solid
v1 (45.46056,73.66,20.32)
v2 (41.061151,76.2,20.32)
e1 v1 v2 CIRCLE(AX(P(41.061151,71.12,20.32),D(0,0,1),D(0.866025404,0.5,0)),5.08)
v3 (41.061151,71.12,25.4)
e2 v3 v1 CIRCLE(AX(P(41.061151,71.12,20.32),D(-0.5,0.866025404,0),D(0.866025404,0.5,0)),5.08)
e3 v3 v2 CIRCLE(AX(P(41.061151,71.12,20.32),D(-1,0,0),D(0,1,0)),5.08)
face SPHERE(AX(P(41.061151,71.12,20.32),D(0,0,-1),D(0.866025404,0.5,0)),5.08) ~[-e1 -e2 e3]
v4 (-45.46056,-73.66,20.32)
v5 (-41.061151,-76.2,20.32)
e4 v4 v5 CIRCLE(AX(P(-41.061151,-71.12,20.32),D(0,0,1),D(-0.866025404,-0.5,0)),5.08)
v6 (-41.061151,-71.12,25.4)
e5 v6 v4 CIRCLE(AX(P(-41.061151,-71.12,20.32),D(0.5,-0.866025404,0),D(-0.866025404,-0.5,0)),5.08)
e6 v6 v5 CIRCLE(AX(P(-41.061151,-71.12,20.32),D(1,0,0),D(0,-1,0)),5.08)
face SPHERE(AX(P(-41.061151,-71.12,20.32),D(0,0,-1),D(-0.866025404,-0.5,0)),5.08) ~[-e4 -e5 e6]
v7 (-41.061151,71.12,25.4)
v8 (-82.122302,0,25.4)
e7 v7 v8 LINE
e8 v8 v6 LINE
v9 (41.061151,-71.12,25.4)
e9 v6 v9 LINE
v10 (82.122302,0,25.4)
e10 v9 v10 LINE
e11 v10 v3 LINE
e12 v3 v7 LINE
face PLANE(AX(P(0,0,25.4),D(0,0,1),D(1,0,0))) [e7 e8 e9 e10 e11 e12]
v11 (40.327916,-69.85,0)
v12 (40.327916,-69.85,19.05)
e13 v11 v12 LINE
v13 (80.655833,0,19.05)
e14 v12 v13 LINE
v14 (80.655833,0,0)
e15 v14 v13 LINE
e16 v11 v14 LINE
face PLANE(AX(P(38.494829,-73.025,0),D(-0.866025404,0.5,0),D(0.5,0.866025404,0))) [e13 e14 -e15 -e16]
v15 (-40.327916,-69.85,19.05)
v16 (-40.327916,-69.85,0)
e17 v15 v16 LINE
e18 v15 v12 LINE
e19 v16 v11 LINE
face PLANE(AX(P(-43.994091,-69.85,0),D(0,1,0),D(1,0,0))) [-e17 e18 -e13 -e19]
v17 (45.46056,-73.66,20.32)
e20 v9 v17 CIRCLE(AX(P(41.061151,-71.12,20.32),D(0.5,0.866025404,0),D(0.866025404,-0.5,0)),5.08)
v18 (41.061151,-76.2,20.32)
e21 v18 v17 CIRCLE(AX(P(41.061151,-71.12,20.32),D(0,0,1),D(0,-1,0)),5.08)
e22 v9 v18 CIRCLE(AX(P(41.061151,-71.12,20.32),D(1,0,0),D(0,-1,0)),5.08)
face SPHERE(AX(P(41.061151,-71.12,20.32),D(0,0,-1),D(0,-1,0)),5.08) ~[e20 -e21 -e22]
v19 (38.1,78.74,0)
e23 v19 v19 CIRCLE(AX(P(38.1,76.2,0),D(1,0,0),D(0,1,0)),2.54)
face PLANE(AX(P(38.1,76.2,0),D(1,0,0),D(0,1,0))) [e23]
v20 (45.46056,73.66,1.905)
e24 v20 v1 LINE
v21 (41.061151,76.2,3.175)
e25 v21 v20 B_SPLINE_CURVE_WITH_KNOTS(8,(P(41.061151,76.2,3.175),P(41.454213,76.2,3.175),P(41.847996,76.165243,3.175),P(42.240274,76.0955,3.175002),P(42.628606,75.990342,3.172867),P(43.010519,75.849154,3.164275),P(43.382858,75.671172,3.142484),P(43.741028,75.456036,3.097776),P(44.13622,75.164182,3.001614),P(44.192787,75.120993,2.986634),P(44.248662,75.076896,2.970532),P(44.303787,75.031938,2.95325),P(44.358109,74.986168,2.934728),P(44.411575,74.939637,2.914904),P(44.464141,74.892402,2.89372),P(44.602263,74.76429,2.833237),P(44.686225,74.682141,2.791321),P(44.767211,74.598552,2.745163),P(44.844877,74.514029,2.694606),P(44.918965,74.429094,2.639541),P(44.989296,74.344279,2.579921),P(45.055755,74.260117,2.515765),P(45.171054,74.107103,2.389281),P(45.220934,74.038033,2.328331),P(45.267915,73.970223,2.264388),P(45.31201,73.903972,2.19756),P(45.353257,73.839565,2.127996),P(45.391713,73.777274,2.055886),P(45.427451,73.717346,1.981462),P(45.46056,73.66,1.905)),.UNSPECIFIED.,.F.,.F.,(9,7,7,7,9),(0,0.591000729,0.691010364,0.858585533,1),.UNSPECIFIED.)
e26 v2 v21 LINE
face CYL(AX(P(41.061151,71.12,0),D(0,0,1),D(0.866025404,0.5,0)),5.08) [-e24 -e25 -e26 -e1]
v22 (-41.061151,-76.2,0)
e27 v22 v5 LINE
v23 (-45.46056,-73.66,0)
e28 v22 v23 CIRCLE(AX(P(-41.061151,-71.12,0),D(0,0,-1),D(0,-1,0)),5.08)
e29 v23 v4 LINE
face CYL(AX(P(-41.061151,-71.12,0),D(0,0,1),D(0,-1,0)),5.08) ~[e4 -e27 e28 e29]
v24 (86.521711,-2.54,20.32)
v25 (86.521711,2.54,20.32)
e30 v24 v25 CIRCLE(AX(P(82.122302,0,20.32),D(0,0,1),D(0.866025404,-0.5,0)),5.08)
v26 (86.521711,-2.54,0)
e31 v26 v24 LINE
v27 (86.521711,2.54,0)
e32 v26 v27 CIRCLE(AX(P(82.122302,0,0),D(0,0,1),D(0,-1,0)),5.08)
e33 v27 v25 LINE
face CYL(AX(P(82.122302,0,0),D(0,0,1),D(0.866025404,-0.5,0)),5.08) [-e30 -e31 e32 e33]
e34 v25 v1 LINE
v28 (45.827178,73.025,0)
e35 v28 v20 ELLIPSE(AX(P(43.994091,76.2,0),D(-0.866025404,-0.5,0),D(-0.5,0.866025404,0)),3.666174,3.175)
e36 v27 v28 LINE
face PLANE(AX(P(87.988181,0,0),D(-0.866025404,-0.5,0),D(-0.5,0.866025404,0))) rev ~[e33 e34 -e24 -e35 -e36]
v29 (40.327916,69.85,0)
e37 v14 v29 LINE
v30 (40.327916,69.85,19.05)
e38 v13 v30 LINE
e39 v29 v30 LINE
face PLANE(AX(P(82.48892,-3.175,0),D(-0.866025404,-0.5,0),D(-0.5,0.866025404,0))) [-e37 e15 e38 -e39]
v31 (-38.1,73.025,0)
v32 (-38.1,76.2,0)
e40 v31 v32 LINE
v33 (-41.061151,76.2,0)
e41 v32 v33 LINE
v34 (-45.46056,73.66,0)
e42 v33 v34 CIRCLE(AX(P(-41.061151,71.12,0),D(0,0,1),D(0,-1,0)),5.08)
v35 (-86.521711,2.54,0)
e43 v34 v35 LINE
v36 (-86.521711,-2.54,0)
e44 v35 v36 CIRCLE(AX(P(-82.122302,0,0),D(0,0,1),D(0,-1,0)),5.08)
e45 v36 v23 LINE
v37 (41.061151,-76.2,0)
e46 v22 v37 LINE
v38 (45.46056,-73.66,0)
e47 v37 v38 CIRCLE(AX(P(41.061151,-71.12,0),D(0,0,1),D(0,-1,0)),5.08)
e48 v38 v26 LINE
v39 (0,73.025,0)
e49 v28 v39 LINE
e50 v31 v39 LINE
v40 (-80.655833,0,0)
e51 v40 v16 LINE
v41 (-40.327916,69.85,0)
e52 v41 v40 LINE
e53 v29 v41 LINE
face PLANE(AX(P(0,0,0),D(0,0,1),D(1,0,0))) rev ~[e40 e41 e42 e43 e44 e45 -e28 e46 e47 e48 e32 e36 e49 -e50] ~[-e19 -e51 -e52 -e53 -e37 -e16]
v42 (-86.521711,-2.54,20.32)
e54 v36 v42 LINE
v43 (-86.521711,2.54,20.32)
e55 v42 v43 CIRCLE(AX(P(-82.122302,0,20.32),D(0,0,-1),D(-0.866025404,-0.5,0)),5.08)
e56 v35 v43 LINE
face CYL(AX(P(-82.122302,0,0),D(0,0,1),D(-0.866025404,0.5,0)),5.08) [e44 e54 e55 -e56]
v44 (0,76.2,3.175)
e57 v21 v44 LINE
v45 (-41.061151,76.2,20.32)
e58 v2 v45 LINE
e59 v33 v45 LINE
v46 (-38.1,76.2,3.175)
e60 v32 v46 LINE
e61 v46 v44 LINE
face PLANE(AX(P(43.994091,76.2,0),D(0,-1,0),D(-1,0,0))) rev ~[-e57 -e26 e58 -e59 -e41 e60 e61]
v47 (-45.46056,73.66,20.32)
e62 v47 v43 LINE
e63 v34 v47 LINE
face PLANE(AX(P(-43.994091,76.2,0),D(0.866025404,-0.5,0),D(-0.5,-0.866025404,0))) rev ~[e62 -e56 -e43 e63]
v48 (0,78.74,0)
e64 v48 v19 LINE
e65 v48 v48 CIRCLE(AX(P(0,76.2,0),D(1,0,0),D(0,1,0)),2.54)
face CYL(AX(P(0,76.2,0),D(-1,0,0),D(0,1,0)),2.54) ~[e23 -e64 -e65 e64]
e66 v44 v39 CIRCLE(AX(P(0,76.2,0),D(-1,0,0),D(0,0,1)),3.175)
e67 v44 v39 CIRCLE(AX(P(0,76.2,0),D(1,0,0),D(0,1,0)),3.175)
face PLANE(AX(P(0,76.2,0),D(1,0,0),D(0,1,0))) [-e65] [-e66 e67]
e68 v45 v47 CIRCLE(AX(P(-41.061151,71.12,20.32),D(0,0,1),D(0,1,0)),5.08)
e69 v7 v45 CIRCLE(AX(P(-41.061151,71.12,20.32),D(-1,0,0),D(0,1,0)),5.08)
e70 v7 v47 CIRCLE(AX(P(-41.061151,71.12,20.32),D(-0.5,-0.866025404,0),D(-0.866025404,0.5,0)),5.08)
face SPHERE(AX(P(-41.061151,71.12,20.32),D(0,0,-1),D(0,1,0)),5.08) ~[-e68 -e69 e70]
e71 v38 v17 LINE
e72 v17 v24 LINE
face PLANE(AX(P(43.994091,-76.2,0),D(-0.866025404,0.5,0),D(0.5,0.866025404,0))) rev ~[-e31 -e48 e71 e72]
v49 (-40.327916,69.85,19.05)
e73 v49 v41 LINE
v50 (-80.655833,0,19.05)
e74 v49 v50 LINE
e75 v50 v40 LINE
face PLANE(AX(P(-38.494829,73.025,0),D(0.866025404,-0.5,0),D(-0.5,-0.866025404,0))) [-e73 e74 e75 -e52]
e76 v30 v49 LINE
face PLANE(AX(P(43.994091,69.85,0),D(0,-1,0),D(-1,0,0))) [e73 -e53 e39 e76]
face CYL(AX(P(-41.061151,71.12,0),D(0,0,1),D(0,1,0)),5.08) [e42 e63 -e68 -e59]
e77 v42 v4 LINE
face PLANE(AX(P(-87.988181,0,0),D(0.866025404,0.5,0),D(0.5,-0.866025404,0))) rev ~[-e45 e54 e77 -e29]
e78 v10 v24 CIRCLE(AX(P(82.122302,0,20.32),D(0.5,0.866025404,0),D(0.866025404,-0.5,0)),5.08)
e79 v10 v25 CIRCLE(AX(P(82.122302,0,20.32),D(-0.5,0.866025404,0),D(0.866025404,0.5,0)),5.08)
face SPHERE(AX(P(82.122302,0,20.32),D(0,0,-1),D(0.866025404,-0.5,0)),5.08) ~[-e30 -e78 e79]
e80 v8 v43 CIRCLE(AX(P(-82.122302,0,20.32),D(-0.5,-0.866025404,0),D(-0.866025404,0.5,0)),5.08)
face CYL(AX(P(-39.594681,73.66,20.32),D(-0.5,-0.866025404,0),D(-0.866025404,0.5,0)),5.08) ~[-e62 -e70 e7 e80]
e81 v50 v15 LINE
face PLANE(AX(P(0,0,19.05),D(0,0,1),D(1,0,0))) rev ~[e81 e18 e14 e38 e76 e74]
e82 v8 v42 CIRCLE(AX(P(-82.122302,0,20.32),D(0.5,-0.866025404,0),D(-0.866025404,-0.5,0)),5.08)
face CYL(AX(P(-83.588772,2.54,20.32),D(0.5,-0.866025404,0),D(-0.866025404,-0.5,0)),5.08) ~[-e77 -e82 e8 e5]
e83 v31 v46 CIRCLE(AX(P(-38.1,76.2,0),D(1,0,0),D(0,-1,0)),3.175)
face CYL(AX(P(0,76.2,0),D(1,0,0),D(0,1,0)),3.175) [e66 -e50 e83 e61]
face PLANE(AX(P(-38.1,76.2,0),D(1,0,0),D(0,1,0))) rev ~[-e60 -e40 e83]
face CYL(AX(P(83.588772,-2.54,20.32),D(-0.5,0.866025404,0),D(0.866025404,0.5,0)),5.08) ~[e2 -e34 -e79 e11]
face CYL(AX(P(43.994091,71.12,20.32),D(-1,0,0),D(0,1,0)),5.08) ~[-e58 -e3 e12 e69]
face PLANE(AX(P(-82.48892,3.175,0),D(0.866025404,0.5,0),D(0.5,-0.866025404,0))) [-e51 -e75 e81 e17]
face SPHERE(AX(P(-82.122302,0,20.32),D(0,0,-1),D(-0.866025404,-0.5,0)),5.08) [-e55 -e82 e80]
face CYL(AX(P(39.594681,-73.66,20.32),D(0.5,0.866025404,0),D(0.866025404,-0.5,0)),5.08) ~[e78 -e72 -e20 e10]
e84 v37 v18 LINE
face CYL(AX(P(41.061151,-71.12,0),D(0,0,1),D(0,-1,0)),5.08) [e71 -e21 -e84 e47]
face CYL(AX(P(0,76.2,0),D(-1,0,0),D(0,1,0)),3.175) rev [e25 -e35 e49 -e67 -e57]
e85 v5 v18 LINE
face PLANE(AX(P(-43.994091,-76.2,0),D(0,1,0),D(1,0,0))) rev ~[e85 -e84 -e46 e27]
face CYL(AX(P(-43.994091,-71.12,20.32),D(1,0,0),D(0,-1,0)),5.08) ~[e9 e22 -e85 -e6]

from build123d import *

# Parameters (mm, degrees)
F1_DEPTH  = 25.4
F2_R      = 5.08
F3_T      = -6.35
F4_R      = 3.175
F5_DEPTH  = 38.1
F8_DEPTH  = 87.2033022895
F9_R      = 3.175
F10_DEPTH = 87.2033022895
F11_R     = 2.54
F12_DEPTH = 38.1


# Not quite as in the source:
# - the program builds the solid bodies; features that only make, move or delete a surface that nothing else refers to are left out


with BuildPart() as f1:
    # F0 (on Top) → F1 (new body)
    with BuildSketch(Plane.XY):
        Polygon((-43.9940905122, -76.2), (43.9940905122, -76.2), (87.9881810245, 0), (43.9940905122, 76.2), (-43.9940905122, 76.2), (-87.9881810245, 0), align=None)
    extrude(amount=F1_DEPTH)

    # F2
    f2_edges = [f1.edges().sort_by_distance(p)[0] for p in [
        (-65.991136, -38.1, 25.4),
        (0, -76.2, 25.4),
        (65.991136, -38.1, 25.4),
        (65.991136, 38.1, 25.4),
        (0, 76.2, 25.4),
        (-65.991136, 38.1, 25.4),
        (43.994091, -76.2, 12.7),
        (87.988181, 0, 12.7),
        (-43.994091, -76.2, 12.7),
        (43.994091, 76.2, 12.7),
        (-43.994091, 76.2, 12.7),
        (-87.988181, 0, 12.7),
    ]]
    fillet(f2_edges, radius=F2_R)

    # F3
    f3_openings = [f1.faces().sort_by_distance(p)[0] for p in [
        (0, 0, 0),
    ]]
    offset(amount=F3_T, openings=f3_openings)

    # F4 (on Right) → F5 (join)
    with BuildSketch(Plane.YZ):
        with Locations((76.2, 0)):
            Circle(F4_R)
    extrude(amount=-F5_DEPTH)

    # F8 (cut, through all): a face of the model
    f8_faces = [f1.faces().sort_by_distance(p)[0] for p in [
        (0, 76.6491706172, -0.4491706172),
    ]]
    extrude(f8_faces, amount=F8_DEPTH, mode=Mode.SUBTRACT)

    # F9 (on face) → F10 (cut, through all)
    with BuildSketch(Plane.YZ):
        with Locations((76.2, 0)):
            Circle(F9_R)
    extrude(amount=F10_DEPTH, mode=Mode.SUBTRACT)

    # F11 (on face) → F12 (join)
    with BuildSketch(Plane.YZ):
        with Locations((76.2, 0)):
            Circle(F11_R)
    extrude(amount=F12_DEPTH)


solid = f1.part
